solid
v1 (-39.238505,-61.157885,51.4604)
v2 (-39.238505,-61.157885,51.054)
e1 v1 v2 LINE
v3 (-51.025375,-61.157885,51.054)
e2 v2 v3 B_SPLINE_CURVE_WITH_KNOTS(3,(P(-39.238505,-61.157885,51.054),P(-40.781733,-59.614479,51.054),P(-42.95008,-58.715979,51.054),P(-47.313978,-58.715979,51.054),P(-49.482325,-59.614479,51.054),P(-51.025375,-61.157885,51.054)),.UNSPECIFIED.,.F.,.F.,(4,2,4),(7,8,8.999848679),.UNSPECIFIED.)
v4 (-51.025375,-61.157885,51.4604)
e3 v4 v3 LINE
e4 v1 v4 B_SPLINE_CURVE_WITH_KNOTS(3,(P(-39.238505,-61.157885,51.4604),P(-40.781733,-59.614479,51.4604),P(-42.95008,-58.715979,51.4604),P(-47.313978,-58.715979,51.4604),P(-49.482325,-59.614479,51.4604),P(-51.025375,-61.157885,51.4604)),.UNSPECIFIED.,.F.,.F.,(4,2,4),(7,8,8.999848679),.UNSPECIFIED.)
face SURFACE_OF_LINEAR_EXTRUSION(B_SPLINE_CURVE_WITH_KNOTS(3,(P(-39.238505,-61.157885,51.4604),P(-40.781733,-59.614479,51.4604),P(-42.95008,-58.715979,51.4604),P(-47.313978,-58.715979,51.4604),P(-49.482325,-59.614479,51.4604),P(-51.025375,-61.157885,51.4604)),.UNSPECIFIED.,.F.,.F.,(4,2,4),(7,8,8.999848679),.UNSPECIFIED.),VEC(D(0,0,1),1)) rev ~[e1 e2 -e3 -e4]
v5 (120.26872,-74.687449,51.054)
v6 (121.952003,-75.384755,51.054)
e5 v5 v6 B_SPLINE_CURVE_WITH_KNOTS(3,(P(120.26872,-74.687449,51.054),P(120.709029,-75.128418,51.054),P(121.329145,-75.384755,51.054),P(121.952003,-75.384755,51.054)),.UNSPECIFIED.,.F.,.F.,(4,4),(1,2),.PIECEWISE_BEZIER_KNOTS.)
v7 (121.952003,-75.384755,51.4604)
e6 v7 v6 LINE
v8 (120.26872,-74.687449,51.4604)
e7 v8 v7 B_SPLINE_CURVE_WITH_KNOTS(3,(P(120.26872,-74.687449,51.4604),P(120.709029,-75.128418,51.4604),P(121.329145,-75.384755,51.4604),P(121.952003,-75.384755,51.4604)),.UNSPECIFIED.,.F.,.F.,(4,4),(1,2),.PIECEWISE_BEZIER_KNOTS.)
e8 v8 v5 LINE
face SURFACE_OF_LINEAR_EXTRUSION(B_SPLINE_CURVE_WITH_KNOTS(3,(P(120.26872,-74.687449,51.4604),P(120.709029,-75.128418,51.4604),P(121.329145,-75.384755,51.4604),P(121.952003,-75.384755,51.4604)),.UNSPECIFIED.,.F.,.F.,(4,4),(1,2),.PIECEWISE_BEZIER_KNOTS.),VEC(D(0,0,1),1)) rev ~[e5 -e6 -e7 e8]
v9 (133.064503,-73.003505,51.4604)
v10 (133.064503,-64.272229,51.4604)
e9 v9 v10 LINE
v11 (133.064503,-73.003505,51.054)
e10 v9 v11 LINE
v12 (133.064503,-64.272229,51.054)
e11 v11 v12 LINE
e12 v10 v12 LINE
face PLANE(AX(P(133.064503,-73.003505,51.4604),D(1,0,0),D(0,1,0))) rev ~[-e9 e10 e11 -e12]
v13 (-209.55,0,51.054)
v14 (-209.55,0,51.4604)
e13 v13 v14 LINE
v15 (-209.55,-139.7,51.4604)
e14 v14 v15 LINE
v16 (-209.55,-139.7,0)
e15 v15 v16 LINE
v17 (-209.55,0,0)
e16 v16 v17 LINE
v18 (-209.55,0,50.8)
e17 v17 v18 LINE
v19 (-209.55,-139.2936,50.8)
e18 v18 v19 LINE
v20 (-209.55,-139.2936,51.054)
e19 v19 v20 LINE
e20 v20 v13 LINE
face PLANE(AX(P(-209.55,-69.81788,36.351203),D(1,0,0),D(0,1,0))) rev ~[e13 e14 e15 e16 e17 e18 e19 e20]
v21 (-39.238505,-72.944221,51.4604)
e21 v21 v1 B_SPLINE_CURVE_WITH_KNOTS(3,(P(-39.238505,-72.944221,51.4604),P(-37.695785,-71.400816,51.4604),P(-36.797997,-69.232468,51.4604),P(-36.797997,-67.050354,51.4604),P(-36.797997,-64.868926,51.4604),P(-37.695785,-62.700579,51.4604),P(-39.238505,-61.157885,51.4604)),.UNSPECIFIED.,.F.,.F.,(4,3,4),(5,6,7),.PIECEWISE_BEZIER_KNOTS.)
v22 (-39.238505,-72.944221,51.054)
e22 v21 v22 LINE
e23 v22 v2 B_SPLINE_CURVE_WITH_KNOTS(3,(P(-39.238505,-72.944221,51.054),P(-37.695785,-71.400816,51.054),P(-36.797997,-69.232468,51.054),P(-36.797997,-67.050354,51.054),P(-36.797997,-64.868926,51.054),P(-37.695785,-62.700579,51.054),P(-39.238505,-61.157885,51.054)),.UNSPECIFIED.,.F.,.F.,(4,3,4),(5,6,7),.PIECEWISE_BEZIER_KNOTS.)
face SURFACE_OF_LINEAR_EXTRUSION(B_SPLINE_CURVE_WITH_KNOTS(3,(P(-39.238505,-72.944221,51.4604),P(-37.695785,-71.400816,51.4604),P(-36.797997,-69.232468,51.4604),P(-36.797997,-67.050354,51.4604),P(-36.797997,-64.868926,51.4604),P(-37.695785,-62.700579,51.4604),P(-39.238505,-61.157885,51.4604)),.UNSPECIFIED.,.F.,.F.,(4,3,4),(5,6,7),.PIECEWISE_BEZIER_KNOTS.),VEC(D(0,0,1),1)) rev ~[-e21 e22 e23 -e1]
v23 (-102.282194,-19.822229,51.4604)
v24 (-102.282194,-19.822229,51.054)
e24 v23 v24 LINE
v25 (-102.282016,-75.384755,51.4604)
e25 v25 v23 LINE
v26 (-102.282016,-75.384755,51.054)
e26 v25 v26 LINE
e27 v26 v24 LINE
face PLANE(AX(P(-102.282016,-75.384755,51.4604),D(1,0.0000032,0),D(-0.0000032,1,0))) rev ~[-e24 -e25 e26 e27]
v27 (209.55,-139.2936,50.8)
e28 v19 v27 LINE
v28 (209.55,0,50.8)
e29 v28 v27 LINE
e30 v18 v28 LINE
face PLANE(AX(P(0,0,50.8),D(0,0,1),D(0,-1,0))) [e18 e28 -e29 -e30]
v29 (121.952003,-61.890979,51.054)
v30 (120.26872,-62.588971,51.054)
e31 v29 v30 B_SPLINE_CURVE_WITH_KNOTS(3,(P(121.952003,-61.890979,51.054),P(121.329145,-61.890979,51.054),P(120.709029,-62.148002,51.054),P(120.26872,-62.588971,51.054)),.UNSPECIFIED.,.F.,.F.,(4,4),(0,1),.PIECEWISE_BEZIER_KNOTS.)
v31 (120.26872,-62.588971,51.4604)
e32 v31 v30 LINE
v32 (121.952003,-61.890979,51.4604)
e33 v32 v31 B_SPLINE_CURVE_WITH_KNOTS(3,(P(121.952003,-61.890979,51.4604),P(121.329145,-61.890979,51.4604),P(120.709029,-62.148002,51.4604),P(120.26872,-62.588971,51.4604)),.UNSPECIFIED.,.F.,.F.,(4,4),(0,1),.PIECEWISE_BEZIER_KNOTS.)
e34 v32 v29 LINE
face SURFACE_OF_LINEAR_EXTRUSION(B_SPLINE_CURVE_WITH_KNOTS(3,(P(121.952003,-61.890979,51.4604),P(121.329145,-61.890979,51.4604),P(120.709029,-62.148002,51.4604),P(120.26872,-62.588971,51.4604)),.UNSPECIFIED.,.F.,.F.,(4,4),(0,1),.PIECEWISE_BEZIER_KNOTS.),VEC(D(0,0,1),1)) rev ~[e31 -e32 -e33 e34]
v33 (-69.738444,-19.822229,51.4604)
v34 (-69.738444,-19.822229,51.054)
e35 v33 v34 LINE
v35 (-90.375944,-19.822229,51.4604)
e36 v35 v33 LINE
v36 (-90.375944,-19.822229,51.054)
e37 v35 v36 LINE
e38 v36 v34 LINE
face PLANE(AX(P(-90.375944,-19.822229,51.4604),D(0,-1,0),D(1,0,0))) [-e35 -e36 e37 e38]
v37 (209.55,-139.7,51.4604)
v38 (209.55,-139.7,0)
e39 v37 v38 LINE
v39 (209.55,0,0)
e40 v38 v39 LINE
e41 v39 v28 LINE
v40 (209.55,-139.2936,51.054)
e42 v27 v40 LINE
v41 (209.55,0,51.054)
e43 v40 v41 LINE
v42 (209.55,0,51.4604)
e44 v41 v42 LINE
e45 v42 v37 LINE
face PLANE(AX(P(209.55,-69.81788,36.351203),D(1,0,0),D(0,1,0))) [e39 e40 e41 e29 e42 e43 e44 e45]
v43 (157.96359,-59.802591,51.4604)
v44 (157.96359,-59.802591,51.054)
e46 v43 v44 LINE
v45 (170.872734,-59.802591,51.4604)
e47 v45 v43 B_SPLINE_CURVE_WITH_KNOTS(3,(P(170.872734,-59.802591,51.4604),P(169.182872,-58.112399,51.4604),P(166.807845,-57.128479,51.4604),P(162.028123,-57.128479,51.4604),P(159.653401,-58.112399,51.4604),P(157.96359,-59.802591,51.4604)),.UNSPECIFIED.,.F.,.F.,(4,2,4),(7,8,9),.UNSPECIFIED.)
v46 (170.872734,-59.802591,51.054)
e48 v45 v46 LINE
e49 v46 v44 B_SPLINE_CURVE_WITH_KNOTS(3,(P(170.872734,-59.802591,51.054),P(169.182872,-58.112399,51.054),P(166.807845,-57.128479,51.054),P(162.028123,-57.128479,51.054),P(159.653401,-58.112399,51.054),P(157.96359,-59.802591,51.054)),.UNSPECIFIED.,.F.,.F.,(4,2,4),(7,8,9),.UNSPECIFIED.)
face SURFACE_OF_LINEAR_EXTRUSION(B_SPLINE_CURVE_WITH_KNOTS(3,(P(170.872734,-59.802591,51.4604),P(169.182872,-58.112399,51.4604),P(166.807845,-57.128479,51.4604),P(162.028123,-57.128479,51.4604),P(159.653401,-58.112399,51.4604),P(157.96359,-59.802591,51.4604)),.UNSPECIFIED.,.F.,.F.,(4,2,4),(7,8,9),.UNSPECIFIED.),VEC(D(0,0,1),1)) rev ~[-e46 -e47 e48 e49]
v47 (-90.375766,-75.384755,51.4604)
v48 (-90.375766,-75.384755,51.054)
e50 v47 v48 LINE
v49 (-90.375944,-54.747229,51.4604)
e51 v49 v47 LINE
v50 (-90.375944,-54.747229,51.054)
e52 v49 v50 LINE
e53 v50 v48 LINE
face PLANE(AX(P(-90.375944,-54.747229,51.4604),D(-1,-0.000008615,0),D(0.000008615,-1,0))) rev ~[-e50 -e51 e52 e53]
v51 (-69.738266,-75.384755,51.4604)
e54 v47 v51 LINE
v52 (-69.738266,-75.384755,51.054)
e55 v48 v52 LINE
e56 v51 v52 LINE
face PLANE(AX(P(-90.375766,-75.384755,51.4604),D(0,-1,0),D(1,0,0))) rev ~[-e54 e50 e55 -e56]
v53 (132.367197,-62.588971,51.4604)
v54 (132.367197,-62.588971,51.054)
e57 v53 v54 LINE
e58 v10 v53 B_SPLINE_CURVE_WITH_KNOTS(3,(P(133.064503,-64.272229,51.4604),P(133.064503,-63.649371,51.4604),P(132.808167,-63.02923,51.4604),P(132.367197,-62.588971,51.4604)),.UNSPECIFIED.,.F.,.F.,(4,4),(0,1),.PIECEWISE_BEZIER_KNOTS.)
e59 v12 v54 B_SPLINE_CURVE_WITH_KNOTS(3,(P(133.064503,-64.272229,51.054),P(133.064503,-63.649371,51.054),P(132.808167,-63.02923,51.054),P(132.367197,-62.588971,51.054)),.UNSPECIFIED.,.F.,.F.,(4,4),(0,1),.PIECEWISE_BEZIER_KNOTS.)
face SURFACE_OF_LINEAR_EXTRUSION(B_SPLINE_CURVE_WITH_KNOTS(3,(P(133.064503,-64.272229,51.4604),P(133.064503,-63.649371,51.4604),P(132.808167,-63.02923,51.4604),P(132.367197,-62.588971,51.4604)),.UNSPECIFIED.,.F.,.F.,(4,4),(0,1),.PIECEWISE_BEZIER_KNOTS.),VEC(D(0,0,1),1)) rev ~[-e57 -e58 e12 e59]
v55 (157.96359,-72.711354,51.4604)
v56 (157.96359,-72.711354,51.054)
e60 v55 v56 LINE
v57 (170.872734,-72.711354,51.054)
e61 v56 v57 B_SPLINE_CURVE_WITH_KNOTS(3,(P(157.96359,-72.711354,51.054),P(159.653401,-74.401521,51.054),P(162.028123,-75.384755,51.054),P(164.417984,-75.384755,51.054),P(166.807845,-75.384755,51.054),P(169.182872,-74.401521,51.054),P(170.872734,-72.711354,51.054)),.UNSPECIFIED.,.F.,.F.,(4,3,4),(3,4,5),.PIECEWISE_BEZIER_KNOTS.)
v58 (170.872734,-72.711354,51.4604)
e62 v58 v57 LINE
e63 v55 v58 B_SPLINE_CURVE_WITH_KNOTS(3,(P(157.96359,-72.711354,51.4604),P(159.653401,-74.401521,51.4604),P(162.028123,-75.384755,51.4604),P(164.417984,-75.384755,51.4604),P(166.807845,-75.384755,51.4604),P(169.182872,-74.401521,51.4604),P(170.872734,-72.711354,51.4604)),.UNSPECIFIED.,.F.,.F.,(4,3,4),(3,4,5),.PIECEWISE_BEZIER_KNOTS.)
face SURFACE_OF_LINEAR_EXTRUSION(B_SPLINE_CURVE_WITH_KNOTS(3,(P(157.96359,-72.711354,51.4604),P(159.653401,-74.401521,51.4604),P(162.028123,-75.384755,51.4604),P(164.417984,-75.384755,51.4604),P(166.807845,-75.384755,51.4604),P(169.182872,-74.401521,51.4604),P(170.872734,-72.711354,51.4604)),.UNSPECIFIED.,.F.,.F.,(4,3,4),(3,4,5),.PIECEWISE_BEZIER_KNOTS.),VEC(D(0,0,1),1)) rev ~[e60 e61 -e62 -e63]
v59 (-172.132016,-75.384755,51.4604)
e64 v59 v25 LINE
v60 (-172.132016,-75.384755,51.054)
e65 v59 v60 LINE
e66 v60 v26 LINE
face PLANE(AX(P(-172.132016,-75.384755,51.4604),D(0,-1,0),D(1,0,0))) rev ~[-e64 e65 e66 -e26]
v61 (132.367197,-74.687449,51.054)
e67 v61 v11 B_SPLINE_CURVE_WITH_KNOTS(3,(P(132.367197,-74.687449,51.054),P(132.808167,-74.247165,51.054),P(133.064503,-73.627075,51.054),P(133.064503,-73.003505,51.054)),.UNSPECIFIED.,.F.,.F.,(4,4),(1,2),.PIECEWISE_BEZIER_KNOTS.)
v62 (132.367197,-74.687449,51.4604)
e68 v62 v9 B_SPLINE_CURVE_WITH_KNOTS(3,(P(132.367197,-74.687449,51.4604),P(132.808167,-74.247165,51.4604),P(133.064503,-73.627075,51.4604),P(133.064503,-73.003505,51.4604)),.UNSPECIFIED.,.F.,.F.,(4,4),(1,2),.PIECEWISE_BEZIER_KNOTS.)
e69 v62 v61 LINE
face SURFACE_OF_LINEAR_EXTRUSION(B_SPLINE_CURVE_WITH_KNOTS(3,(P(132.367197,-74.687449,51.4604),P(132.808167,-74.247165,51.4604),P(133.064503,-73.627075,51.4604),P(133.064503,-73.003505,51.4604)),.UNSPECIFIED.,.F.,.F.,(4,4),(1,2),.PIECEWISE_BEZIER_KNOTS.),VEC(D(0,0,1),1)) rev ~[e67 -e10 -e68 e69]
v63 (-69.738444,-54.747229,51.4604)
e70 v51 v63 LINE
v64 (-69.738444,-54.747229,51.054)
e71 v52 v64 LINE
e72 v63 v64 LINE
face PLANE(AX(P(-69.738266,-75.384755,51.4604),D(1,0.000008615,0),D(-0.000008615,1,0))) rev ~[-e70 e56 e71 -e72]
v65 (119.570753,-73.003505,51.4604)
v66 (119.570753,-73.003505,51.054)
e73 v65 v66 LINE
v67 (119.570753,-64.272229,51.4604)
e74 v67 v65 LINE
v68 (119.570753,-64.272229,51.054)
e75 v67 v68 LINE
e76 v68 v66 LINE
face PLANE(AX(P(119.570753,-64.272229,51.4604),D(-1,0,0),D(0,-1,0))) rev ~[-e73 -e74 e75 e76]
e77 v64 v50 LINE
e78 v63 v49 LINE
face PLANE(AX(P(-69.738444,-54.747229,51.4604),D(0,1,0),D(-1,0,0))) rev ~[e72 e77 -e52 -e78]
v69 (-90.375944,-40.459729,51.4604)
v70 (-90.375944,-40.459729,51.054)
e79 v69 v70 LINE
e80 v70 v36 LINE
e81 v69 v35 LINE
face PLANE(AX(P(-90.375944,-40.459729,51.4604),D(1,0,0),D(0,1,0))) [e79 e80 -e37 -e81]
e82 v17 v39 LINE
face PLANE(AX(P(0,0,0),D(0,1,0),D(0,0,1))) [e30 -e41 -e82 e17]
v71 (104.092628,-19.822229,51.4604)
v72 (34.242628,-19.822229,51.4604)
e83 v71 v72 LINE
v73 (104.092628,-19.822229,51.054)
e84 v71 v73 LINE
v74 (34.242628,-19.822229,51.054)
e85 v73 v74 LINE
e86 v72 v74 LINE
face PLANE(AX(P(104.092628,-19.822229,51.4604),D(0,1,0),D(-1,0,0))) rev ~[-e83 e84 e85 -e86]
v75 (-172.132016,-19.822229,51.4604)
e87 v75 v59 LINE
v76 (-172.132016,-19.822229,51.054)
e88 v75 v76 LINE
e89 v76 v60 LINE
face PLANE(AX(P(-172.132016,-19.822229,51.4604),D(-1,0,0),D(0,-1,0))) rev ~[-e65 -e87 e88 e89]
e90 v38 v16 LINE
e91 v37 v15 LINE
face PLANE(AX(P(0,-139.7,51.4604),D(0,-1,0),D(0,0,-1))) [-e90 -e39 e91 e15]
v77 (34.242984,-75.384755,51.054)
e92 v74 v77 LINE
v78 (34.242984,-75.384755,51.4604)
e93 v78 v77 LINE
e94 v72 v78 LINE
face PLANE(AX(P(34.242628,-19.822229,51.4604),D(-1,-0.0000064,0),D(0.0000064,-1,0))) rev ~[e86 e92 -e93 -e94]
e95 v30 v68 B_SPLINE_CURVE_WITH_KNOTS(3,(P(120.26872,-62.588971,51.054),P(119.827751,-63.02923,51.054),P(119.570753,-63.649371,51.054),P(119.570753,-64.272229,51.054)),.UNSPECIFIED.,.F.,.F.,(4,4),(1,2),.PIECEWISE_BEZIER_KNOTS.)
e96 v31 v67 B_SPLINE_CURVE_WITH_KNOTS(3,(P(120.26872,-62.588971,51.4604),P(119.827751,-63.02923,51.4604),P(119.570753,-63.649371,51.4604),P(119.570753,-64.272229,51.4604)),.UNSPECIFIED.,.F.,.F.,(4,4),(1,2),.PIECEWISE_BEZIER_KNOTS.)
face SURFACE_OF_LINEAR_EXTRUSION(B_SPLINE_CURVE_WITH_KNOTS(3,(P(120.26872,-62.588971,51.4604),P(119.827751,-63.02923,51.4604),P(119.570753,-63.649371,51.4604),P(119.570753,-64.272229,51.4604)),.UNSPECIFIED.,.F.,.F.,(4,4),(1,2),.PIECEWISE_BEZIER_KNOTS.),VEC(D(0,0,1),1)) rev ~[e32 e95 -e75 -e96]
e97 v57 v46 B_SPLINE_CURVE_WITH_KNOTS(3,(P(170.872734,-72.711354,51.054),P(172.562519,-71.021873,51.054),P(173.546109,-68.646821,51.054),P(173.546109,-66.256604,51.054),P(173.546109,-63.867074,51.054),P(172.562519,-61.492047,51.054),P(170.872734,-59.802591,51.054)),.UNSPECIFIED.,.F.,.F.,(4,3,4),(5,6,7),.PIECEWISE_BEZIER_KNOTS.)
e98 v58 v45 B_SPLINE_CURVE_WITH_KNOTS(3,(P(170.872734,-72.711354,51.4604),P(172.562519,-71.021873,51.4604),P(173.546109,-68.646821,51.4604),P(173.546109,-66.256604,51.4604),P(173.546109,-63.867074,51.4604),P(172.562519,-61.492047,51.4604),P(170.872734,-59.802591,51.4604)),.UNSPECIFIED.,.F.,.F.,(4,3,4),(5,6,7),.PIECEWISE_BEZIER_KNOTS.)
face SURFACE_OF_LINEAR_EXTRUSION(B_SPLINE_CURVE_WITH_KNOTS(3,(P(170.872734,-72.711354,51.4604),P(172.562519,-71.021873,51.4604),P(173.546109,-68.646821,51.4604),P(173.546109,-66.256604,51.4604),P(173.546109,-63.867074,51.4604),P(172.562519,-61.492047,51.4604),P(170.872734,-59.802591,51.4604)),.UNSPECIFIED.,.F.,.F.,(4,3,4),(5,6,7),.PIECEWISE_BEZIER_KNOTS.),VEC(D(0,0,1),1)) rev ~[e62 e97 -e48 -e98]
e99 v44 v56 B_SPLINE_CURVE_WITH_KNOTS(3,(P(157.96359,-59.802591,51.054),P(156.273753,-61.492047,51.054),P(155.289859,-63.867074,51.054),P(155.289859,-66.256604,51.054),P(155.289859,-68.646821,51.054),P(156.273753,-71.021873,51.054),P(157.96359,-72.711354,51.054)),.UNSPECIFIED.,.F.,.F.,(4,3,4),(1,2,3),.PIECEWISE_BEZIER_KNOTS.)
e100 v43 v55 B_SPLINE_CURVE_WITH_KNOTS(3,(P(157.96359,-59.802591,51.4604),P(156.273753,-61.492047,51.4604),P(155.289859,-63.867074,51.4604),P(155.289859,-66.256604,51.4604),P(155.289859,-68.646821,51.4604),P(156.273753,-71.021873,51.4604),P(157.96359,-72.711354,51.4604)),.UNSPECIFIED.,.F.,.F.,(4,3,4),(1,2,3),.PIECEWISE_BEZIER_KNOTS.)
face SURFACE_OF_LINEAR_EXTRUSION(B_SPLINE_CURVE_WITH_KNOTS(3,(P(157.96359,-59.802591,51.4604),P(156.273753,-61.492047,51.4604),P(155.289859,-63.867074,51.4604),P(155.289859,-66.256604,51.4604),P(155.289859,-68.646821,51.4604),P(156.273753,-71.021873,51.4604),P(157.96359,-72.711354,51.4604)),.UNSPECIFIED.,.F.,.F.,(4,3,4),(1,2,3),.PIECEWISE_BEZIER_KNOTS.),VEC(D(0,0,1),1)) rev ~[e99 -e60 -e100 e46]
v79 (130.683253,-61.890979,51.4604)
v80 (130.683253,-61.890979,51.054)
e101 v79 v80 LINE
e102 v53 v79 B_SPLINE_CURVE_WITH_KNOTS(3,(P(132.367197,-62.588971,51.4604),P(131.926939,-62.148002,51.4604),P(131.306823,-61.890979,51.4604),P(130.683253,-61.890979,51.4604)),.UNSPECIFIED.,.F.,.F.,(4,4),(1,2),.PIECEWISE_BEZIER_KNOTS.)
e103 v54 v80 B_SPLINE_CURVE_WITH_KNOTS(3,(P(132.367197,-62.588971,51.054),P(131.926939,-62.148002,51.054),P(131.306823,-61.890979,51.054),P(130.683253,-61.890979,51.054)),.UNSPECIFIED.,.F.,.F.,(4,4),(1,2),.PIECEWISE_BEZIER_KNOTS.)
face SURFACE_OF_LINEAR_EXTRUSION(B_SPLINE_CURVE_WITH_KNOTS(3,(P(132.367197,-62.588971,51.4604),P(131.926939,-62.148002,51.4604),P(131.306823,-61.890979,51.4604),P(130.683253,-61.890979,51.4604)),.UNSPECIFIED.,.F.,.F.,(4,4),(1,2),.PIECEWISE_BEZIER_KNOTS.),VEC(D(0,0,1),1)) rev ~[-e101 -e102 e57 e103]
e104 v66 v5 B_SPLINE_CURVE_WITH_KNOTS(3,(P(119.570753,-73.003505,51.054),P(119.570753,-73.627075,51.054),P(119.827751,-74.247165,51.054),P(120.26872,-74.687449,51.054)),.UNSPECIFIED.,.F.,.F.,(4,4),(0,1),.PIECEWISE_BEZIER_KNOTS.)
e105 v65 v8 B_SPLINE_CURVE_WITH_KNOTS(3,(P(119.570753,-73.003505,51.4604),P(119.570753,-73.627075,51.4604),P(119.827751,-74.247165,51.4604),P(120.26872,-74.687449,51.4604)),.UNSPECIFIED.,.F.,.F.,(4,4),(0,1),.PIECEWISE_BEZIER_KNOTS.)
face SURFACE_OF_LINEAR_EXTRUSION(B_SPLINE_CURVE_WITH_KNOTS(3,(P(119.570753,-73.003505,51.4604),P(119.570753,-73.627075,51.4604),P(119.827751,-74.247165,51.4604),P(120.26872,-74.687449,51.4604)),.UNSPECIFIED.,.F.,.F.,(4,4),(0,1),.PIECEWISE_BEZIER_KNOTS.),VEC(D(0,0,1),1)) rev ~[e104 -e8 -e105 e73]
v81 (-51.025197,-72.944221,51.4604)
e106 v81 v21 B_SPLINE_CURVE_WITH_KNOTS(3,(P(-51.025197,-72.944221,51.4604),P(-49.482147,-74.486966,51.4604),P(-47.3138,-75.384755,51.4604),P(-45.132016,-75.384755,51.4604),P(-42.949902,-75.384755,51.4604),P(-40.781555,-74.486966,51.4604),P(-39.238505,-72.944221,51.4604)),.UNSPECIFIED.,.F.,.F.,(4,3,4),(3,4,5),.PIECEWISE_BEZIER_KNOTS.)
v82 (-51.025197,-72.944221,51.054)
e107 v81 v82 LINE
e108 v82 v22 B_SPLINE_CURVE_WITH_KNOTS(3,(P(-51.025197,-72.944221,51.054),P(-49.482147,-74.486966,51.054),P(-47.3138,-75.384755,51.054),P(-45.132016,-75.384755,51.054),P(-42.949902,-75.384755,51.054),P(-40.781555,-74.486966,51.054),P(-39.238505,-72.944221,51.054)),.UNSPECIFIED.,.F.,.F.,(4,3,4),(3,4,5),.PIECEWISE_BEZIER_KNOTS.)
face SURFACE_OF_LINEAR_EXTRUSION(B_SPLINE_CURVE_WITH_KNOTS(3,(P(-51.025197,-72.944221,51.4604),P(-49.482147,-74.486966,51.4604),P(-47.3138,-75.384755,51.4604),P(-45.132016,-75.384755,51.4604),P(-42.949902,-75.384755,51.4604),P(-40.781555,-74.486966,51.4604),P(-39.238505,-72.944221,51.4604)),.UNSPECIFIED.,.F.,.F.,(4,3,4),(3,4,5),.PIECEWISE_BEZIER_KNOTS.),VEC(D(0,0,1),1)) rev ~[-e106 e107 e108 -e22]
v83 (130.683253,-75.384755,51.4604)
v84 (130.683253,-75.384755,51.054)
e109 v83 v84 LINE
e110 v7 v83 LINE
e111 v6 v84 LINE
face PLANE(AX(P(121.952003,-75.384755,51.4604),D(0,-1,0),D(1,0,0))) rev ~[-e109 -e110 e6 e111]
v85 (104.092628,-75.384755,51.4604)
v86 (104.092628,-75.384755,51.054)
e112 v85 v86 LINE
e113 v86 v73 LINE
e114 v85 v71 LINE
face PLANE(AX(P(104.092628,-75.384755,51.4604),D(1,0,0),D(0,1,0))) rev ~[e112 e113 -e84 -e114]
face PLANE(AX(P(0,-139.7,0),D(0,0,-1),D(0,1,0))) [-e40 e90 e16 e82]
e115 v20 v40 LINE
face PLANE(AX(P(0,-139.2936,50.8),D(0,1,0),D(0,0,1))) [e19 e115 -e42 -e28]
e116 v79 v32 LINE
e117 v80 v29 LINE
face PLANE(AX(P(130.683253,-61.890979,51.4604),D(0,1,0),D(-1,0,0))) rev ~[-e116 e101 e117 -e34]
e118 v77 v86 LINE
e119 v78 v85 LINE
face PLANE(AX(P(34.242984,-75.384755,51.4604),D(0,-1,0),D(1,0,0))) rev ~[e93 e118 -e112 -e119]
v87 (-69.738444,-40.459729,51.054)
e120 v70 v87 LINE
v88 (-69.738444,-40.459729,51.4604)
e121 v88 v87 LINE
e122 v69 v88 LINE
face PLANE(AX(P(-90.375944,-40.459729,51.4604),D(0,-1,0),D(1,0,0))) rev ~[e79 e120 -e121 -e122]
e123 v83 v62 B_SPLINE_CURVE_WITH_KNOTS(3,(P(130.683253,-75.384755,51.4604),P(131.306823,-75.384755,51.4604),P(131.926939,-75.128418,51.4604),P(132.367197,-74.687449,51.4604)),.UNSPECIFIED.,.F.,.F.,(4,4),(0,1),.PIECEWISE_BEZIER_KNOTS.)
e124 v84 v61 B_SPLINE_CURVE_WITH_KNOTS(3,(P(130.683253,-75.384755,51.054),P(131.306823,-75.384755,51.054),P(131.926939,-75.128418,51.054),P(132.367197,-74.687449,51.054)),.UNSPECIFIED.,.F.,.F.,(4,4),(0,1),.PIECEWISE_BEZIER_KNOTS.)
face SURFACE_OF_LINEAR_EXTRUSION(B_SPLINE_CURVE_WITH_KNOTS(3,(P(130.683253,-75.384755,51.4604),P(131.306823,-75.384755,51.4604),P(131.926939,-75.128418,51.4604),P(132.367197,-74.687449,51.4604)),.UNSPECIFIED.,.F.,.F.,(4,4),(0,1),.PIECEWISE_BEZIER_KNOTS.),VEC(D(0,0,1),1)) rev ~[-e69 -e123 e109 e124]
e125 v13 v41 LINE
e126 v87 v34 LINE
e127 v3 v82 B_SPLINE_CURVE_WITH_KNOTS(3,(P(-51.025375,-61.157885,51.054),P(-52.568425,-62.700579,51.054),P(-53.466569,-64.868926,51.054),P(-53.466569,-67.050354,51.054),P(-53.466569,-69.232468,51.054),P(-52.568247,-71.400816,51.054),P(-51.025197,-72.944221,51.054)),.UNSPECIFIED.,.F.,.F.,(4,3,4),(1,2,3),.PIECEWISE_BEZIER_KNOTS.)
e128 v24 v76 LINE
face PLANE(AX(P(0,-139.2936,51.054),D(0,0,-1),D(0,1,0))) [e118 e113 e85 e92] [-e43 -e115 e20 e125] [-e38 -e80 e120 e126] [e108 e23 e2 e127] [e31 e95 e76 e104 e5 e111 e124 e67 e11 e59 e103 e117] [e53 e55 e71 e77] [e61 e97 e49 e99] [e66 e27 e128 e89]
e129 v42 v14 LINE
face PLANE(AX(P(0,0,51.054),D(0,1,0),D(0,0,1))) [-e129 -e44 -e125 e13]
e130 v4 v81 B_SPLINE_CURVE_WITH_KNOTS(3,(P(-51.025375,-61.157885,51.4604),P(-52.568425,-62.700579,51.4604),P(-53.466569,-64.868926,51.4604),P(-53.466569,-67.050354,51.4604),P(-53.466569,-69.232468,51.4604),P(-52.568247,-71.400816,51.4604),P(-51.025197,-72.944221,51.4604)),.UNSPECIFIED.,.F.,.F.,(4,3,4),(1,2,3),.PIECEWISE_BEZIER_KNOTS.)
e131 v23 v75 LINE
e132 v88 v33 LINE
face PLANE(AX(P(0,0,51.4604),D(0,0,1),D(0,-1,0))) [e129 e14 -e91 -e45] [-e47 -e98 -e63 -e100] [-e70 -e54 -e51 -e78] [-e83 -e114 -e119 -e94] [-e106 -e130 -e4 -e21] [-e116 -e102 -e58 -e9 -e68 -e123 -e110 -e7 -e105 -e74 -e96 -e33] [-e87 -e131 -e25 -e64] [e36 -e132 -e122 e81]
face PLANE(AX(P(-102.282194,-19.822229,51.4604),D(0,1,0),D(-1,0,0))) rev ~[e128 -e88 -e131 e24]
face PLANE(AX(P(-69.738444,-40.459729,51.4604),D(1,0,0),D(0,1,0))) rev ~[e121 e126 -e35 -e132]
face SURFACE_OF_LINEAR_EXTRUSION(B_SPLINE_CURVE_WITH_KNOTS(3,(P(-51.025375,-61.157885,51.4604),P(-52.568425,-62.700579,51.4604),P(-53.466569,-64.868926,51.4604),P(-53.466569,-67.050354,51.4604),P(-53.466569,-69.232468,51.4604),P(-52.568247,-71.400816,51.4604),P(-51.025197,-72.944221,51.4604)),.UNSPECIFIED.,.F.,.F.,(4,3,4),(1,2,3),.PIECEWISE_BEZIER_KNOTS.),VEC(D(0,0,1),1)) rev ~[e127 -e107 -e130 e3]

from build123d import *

# Parameters (mm, degrees)
F1_DEPTH = 209.55
F2_W     = 20.6375
F2_H     = 20.6375
F3_DEPTH = 0.4064


# Not quite as in the source:
# - the dataset's text gives a spline's control points without its knots; the knots are read off the source's solid


with BuildPart() as f1:
    # F0 (on Right) → F1 (new body, symmetric)
    with BuildSketch(Plane.YZ):
        Polygon((-139.7, 0), (0, 0), (0, 50.8), (-139.2936, 50.8), (-139.2936, 51.054), (0, 51.054), (0, 51.4604), (-139.7, 51.4604), align=None)
    extrude(amount=F1_DEPTH, both=True)

    # F2 (on face) → F3 (cut, through all)
    with BuildSketch(Plane.XY.offset(51.4604)):
        with BuildLine():
            add(Edge.make_bspline(
                [(120.2687199611, -62.5889714683), (119.8277505611, -63.0292296683), (119.5707533611, -63.6493706683), (119.5707533611, -64.2722294683)],
                knots=[1, 1, 1, 1, 2, 2, 2, 2], degree=3))
            Line((119.5707533611, -64.2722294683), (119.5707533611, -73.0035048683))
            add(Edge.make_bspline(
                [(119.5707533611, -73.0035048683), (119.5707533611, -73.6270748683), (119.8277505611, -74.2471650683), (120.2687199611, -74.6874486683)],
                knots=[0, 0, 0, 0, 1, 1, 1, 1], degree=3))
            add(Edge.make_bspline(
                [(120.2687199611, -74.6874486683), (120.7090289611, -75.1284180683), (121.3291445611, -75.3847548683), (121.9520033611, -75.3847548683)],
                knots=[1, 1, 1, 1, 2, 2, 2, 2], degree=3))
            Line((121.9520033611, -75.3847548683), (130.6832533611, -75.3847548683))
            add(Edge.make_bspline(
                [(130.6832533611, -75.3847548683), (131.3068233611, -75.3847548683), (131.9269389611, -75.1284180683), (132.3671971611, -74.6874486683)],
                knots=[0, 0, 0, 0, 1, 1, 1, 1], degree=3))
            add(Edge.make_bspline(
                [(132.3671971611, -74.6874486683), (132.8081665611, -74.2471650683), (133.0645033611, -73.6270748683), (133.0645033611, -73.0035048683)],
                knots=[1, 1, 1, 1, 2, 2, 2, 2], degree=3))
            Line((133.0645033611, -73.0035048683), (133.0645033611, -64.2722294683))
            add(Edge.make_bspline(
                [(133.0645033611, -64.2722294683), (133.0645033611, -63.6493706683), (132.8081665611, -63.0292296683), (132.3671971611, -62.5889714683)],
                knots=[0, 0, 0, 0, 1, 1, 1, 1], degree=3))
            add(Edge.make_bspline(
                [(132.3671971611, -62.5889714683), (131.9269389611, -62.1480020683), (131.3068233611, -61.8909794683), (130.6832533611, -61.8909794683)],
                knots=[1, 1, 1, 1, 2, 2, 2, 2], degree=3))
            Line((130.6832533611, -61.8909794683), (121.9520033611, -61.8909794683))
            add(Edge.make_bspline(
                [(121.9520033611, -61.8909794683), (121.3291445611, -61.8909794683), (120.7090289611, -62.1480020683), (120.2687199611, -62.5889714683)],
                knots=[0, 0, 0, 0, 1, 1, 1, 1], degree=3))
        make_face()
        Polygon((-172.1320160389, -19.8222294683), (-172.1320160389, -75.3847548683), (-102.2820160389, -75.3847548683), (-102.2821938389, -19.8222294683), align=None)
        Polygon((-90.3757660389, -75.3847548683), (-69.7382660389, -75.3847548683), (-69.7384438389, -54.7472294683), (-90.3759438389, -54.7472294683), align=None)
        with Locations((-80.0571938389, -30.1409794683)):
            Rectangle(F2_W, F2_H)
        Polygon((34.2429839611, -75.3847548683), (104.0926283611, -75.3847548683), (104.0926283611, -19.8222294683), (34.2426283611, -19.8222294683), align=None)
        with BuildLine():
            add(Edge.make_bspline(
                [(-39.2385048389, -61.1578846683), (-40.7817326389, -59.6144790683), (-42.9500798389, -58.7159794683), (-45.1321938389, -58.7159794683)],
                knots=[7, 7, 7, 7, 8, 8, 8, 8], degree=3))
            add(Edge.make_bspline(
                [(-45.1321938389, -58.7159794683), (-47.3139776389, -58.7159794683), (-49.4823248389, -59.6144790683), (-51.0253748389, -61.1578846683)],
                knots=[0, 0, 0, 0, 1, 1, 1, 1], degree=3))
            add(Edge.make_bspline(
                [(-51.0253748389, -61.1578846683), (-52.5684248389, -62.7005790683), (-53.4665688389, -64.8689262683), (-53.4665688389, -67.0503544683), (-53.4665688389, -69.2324684683), (-52.5682470389, -71.4008156683), (-51.0251970389, -72.9442212683)],
                knots=[1, 1, 1, 1, 2, 2, 2, 3, 3, 3, 3], degree=3))
            add(Edge.make_bspline(
                [(-51.0251970389, -72.9442212683), (-49.4821470389, -74.4869664683), (-47.3137998389, -75.3847548683), (-45.1320160389, -75.3847548683), (-42.9499020389, -75.3847548683), (-40.7815548389, -74.4869664683), (-39.2385048389, -72.9442212683)],
                knots=[3, 3, 3, 3, 4, 4, 4, 5, 5, 5, 5], degree=3))
            add(Edge.make_bspline(
                [(-39.2385048389, -72.9442212683), (-37.6957850389, -71.4008156683), (-36.7979966389, -69.2324684683), (-36.7979966389, -67.0503544683), (-36.7979966389, -64.8689262683), (-37.6957850389, -62.7005790683), (-39.2385048389, -61.1578846683)],
                knots=[5, 5, 5, 5, 6, 6, 6, 7, 7, 7, 7], degree=3))
        make_face()
        with BuildLine():
            add(Edge.make_bspline(
                [(170.8727335611, -59.8025914683), (169.1828715611, -58.1123992683), (166.8078445611, -57.1284794683), (164.4179839611, -57.1284794683)],
                knots=[7, 7, 7, 7, 8, 8, 8, 8], degree=3))
            add(Edge.make_bspline(
                [(164.4179839611, -57.1284794683), (162.0281233611, -57.1284794683), (159.6534011611, -58.1123992683), (157.9635899611, -59.8025914683)],
                knots=[0, 0, 0, 0, 1, 1, 1, 1], degree=3))
            add(Edge.make_bspline(
                [(157.9635899611, -59.8025914683), (156.2737533611, -61.4920470683), (155.2898589611, -63.8670740683), (155.2898589611, -66.2566044683), (155.2898589611, -68.6468206683), (156.2737533611, -71.0218730683), (157.9635899611, -72.7113540683)],
                knots=[1, 1, 1, 1, 2, 2, 2, 3, 3, 3, 3], degree=3))
            add(Edge.make_bspline(
                [(157.9635899611, -72.7113540683), (159.6534011611, -74.4015208683), (162.0281233611, -75.3847548683), (164.4179839611, -75.3847548683), (166.8078445611, -75.3847548683), (169.1828715611, -74.4015208683), (170.8727335611, -72.7113540683)],
                knots=[3, 3, 3, 3, 4, 4, 4, 5, 5, 5, 5], degree=3))
            add(Edge.make_bspline(
                [(170.8727335611, -72.7113540683), (172.5625193611, -71.0218730683), (173.5461089611, -68.6468206683), (173.5461089611, -66.2566044683), (173.5461089611, -63.8670740683), (172.5625193611, -61.4920470683), (170.8727335611, -59.8025914683)],
                knots=[5, 5, 5, 5, 6, 6, 6, 7, 7, 7, 7], degree=3))
        make_face()
    extrude(amount=-F3_DEPTH, mode=Mode.SUBTRACT)


solid = f1.part
